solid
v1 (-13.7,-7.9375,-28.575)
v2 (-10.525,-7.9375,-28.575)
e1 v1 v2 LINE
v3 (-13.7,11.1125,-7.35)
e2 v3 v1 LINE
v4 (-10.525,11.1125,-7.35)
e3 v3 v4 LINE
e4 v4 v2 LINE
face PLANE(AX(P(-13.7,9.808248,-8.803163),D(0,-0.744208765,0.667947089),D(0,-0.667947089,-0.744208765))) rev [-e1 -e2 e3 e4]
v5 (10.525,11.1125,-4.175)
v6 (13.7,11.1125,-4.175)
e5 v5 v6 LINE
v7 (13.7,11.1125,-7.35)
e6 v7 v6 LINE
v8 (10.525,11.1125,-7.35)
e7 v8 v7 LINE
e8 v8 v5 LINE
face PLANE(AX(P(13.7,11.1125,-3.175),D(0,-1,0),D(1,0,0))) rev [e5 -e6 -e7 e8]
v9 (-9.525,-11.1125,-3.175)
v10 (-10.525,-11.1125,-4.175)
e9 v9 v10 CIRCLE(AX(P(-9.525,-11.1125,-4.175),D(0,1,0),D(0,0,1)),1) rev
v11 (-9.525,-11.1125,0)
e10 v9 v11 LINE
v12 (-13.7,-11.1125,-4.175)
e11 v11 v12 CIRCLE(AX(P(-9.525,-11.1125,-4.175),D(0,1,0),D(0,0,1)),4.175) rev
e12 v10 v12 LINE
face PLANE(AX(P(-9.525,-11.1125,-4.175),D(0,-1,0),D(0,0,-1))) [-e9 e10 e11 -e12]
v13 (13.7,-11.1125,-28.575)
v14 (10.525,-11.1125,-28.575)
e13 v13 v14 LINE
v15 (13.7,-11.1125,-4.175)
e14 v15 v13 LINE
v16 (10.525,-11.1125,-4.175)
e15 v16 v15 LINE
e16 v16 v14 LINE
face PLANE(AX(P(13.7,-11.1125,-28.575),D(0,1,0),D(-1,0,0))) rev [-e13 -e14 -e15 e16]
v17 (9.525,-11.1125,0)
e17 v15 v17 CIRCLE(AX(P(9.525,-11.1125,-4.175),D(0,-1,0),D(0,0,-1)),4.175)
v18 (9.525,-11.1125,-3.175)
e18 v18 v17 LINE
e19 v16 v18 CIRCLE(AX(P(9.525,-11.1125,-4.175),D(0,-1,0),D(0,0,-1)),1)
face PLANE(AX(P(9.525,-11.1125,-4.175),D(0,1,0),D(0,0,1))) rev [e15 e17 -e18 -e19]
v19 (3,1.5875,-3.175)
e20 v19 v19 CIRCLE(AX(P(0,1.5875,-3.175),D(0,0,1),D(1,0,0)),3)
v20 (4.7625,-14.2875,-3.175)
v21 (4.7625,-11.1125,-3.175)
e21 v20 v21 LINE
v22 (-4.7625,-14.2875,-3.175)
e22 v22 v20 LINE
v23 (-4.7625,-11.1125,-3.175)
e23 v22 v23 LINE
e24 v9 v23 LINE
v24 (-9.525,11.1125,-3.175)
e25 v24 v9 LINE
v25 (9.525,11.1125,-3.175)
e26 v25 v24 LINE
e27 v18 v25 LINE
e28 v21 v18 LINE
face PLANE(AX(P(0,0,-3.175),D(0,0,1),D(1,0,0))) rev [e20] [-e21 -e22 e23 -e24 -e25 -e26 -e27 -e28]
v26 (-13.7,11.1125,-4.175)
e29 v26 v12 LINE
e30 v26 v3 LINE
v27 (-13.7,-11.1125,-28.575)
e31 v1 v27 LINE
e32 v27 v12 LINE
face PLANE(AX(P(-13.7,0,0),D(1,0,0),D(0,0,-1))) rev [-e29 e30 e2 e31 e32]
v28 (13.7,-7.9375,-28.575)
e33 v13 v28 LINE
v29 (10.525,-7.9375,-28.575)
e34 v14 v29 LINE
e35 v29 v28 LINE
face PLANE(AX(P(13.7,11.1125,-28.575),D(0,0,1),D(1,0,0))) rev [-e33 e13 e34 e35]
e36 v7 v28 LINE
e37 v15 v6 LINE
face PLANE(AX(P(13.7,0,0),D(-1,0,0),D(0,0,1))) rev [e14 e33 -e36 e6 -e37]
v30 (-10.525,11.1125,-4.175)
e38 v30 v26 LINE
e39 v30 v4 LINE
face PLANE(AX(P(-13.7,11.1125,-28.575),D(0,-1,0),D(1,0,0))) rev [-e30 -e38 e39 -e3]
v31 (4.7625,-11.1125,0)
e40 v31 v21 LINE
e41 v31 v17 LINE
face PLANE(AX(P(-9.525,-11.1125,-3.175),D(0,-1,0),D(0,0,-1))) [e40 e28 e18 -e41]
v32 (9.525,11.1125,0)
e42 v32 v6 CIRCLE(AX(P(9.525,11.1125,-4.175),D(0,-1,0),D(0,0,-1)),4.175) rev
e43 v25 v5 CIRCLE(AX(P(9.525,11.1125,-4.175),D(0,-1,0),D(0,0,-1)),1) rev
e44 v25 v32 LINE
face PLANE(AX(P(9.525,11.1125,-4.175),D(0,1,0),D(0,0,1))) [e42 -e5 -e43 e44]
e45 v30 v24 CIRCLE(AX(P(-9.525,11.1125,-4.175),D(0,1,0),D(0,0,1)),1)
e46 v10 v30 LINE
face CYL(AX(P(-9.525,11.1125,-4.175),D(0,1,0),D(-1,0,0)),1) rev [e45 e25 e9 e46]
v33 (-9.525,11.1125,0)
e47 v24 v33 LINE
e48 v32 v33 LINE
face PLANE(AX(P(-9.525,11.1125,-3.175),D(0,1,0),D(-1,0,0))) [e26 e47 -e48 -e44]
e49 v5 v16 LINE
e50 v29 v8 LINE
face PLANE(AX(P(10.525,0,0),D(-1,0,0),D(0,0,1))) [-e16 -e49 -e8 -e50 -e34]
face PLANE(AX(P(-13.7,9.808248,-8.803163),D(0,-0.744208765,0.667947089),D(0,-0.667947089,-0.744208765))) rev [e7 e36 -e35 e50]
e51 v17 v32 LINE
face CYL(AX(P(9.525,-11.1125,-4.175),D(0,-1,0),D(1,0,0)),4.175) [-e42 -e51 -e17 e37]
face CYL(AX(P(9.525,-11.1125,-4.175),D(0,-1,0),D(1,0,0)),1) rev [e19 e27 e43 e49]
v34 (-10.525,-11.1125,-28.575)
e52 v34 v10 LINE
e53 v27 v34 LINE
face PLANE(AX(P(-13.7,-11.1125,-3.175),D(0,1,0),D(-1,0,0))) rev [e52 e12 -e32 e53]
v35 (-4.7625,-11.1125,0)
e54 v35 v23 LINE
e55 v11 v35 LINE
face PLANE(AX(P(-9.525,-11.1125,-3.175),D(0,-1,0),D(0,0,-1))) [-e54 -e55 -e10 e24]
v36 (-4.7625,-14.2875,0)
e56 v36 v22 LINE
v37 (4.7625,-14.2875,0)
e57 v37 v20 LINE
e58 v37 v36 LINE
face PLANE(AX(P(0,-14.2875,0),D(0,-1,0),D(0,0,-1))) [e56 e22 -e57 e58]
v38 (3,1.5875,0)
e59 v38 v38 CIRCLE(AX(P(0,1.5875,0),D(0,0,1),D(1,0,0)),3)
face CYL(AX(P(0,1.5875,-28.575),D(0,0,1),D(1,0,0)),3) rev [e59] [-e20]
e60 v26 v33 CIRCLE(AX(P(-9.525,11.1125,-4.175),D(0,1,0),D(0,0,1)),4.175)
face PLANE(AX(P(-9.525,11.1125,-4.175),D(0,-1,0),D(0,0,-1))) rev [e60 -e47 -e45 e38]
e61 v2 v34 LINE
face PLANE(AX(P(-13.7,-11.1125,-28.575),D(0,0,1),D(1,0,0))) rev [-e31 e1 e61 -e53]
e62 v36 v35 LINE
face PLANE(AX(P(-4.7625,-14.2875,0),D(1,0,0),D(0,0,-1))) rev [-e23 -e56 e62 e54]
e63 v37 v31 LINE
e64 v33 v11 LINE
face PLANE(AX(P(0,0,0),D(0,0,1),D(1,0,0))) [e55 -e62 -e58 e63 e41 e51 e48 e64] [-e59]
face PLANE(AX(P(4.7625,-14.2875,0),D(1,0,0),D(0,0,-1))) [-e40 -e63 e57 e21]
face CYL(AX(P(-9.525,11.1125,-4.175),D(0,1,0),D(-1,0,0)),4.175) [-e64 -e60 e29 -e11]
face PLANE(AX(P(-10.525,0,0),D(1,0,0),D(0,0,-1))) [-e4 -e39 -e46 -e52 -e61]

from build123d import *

# Parameters (mm, degrees)
SKETCH1_W           = 19.05
SKETCH1_H           = 22.225
BASE_FLANGE1_DEPTH  = 3.175
EDGE_FLANGE1_DEPTH  = 22.225
EDGE_FLANGE2_DEPTH  = 22.225
CUT_EXTRUDE1_DEPTH  = 42.119074421
SKETCH13_W          = 9.525
SKETCH13_H          = 3.175
BOSS_EXTRUDE1_DEPTH = 3.175
CUT_EXTRUDE2_DEPTH  = 35.761376285


# Sheet-metal steps are written as plain solids
with BuildPart() as part:
    # Sketch1 → Base-Flange1 (new body)
    with BuildSketch(Plane.XY):
        Rectangle(SKETCH1_W, SKETCH1_H)
    extrude(amount=-BASE_FLANGE1_DEPTH)

    # Edge-Flange1 section (across the edge) → Edge-Flange1 (add)
    with BuildSketch(Plane(origin=(10.525, 11.1125, -3.175), x_dir=(-1, 0, 0), z_dir=(0, -1, 0))):
        with BuildLine():
            Line((-3.175, 1), (-3.175, 25.4))
            Line((-3.175, 25.4), (0, 25.4))
            Line((0, 25.4), (0, 1))
            ThreePointArc((0, 1), (0.292893219, 0.292893219), (1, 0))
            Line((1, 0), (1, -3.175))
            ThreePointArc((1, -3.175), (-1.952170811, -1.952170811), (-3.175, 1))
        make_face()
    extrude(amount=EDGE_FLANGE1_DEPTH)

    # Edge-Flange2 section (across the edge) → Edge-Flange2 (add)
    with BuildSketch(Plane(origin=(-10.525, -11.1125, -3.175), x_dir=(1, 0, 0), z_dir=(0, 1, 0))):
        with BuildLine():
            Line((-3.175, 1), (-3.175, 25.4))
            Line((-3.175, 25.4), (0, 25.4))
            Line((0, 25.4), (0, 1))
            ThreePointArc((0, 1), (0.292893219, 0.292893219), (1, 0))
            Line((1, 0), (1, -3.175))
            ThreePointArc((1, -3.175), (-1.952170811, -1.952170811), (-3.175, 1))
        make_face()
    extrude(amount=EDGE_FLANGE2_DEPTH)

    # Sketch12 → Cut-Extrude1 (cut, through all)
    with BuildSketch(Plane(origin=(13.7, 0, 0), x_dir=(0, 0, -1), z_dir=(1, 0, 0))):
        Polygon((28.575, 11.1125), (7.35, 11.1125), (28.575, -7.9375), align=None)
    extrude(amount=-CUT_EXTRUDE1_DEPTH, mode=Mode.SUBTRACT)

    # Sketch13 → Boss-Extrude1 (add)
    with BuildSketch(Plane.XZ.offset(11.1125)):
        with Locations((0, -1.5875)):
            Rectangle(SKETCH13_W, SKETCH13_H)
    extrude(amount=BOSS_EXTRUDE1_DEPTH)

    # Sketch14 → Cut-Extrude2 (cut, through all)
    with BuildSketch(Plane.XY):
        with BuildLine():
            ThreePointArc((-3, 1.5875), (0, -1.4125), (3, 1.5875))
            Line((3, 1.5875), (-3, 1.5875))
        make_face()
        with BuildLine():
            Line((-3, 1.5875), (3, 1.5875))
            ThreePointArc((3, 1.5875), (0, 4.5875), (-3, 1.5875))
        make_face()
    extrude(amount=-CUT_EXTRUDE2_DEPTH, mode=Mode.SUBTRACT)


solid = part.part
